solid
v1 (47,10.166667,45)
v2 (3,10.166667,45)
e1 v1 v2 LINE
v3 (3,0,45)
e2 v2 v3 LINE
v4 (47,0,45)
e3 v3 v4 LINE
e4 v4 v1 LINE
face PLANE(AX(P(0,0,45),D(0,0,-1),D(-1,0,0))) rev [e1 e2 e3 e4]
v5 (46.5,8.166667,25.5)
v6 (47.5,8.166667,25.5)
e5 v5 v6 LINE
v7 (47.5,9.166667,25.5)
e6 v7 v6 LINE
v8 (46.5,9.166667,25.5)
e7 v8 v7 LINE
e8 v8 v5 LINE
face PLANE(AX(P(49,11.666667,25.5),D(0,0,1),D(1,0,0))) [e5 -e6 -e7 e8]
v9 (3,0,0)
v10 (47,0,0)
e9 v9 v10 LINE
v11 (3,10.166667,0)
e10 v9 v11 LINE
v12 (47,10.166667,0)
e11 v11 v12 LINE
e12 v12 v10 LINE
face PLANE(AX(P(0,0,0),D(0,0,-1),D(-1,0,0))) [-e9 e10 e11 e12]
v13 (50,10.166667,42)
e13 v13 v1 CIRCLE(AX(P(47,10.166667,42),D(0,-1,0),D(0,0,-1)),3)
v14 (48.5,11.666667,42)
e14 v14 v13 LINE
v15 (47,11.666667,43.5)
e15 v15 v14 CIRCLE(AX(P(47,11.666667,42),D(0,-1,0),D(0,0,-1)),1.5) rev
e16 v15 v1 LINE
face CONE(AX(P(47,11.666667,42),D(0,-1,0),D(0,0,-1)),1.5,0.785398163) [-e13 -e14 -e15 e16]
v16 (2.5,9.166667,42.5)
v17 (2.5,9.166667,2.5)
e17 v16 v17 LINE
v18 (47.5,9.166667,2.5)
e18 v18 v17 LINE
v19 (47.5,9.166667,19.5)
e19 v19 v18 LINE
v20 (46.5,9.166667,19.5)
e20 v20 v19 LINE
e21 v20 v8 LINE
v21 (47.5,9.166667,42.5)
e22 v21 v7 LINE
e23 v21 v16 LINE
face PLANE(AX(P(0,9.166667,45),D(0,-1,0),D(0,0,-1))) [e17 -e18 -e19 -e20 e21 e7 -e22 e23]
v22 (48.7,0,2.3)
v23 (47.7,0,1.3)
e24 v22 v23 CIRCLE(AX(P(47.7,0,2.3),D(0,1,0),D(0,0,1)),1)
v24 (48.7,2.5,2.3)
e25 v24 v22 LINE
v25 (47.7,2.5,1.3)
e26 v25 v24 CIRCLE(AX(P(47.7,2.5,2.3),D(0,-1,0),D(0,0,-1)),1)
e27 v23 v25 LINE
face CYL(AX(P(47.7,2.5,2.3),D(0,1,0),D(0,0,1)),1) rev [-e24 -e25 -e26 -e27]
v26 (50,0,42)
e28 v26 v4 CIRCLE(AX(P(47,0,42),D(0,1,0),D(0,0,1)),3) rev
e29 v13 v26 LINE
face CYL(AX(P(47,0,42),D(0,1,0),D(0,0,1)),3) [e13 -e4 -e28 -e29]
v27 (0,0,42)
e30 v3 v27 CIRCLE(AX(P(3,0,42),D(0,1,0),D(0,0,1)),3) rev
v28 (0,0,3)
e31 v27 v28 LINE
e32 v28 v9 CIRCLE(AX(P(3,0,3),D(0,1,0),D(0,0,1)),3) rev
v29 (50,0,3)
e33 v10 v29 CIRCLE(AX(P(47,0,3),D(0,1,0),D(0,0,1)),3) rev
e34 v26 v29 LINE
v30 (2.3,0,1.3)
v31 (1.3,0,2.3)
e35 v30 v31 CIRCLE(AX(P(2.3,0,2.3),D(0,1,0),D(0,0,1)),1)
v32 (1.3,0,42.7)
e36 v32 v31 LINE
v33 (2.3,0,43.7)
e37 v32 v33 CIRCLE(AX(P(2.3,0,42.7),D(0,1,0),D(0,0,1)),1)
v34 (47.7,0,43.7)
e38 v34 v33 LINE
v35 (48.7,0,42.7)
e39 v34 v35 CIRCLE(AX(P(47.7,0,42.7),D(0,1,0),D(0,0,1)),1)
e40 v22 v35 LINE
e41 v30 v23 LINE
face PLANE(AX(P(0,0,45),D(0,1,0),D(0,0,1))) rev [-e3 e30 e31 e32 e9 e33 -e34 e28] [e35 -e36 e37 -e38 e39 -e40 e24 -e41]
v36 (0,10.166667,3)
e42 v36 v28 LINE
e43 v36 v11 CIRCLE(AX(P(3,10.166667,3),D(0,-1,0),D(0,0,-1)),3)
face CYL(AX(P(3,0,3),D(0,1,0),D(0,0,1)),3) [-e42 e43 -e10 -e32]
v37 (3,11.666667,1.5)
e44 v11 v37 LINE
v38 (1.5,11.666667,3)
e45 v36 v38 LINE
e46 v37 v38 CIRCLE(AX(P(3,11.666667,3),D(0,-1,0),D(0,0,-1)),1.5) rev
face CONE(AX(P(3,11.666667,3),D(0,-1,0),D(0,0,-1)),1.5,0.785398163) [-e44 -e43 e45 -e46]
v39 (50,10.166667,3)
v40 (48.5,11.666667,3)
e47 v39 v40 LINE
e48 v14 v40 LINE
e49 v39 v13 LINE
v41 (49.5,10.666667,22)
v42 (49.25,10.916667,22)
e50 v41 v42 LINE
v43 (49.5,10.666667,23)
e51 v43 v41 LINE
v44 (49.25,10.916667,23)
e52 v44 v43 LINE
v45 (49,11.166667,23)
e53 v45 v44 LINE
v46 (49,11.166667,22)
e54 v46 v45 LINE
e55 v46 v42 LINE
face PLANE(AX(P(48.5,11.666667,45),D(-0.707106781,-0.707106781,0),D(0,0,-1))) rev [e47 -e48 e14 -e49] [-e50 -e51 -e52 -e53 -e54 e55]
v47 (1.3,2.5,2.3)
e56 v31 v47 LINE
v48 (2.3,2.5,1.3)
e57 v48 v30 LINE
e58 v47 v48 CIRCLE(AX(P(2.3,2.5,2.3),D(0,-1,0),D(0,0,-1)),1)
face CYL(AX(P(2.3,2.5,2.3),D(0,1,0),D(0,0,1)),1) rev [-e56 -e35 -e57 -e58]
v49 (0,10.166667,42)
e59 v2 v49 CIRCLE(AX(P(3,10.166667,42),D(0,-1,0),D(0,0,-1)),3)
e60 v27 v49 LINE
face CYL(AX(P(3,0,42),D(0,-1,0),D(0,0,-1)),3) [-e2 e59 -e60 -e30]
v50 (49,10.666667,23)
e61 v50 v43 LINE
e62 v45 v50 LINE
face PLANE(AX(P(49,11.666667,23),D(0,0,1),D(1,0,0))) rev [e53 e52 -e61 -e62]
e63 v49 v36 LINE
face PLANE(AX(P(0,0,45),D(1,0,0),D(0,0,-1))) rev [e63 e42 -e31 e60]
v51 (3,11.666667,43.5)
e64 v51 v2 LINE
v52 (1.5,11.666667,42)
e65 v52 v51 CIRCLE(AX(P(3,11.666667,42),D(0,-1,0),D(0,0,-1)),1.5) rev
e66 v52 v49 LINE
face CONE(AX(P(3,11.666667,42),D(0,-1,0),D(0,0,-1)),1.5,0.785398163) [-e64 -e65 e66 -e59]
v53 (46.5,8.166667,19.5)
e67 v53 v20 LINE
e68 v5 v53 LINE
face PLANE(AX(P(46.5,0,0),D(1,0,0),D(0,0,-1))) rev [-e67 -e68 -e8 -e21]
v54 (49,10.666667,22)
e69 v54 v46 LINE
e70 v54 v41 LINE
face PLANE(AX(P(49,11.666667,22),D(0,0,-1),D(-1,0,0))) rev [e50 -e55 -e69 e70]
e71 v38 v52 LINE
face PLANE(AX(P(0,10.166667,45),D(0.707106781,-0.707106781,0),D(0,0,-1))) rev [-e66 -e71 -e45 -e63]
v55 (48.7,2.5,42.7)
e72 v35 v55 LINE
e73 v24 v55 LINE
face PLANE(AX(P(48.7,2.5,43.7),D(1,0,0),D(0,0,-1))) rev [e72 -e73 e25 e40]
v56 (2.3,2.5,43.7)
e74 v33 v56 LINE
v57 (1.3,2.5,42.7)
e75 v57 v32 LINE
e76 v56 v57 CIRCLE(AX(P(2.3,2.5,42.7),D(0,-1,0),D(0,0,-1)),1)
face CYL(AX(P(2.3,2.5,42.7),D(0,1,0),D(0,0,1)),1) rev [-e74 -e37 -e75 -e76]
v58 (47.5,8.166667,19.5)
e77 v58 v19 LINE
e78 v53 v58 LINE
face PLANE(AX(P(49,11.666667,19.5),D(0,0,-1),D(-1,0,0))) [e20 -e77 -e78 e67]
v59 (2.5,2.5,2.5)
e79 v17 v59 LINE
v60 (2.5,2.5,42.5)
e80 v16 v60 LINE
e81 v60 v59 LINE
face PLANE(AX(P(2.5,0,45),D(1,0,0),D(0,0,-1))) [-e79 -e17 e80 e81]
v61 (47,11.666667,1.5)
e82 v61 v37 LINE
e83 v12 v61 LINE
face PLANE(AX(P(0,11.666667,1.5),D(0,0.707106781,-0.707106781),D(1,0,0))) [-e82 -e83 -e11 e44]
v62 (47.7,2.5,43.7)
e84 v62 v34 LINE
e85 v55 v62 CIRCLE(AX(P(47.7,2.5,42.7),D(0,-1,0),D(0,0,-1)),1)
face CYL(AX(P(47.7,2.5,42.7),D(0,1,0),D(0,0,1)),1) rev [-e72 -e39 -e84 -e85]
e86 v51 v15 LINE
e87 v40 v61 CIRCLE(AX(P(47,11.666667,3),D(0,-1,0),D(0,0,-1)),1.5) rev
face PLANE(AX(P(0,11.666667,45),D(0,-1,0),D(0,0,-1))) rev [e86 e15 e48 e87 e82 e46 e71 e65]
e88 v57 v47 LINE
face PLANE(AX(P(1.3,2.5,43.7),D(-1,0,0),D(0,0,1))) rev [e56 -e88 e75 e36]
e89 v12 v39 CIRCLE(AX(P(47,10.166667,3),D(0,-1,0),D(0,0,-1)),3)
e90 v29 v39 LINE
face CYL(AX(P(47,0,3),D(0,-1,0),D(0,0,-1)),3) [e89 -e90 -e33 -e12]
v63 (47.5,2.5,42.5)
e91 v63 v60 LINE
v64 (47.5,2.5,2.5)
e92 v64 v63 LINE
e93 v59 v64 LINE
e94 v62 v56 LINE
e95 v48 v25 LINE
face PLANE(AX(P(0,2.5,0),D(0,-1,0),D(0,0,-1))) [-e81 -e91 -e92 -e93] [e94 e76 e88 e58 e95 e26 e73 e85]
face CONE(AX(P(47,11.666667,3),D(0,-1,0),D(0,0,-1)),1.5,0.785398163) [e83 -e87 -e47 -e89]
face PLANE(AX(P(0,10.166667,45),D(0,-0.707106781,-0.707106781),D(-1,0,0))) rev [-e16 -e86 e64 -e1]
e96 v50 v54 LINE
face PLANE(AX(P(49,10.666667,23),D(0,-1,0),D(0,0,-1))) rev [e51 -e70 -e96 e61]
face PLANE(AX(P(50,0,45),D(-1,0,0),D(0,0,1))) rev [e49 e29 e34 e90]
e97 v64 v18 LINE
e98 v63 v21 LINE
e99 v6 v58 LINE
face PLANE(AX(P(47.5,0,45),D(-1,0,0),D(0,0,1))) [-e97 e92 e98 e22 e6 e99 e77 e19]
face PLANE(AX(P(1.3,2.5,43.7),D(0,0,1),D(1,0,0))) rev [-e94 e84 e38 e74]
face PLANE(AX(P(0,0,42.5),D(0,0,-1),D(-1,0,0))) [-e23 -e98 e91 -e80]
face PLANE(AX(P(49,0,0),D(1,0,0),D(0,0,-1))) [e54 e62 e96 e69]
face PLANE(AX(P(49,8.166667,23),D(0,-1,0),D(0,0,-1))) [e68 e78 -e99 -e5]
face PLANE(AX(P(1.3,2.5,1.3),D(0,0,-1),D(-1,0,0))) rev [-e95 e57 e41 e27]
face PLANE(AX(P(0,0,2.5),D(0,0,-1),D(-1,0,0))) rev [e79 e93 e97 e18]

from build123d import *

# Parameters (mm, degrees)
SKETCH1_W           = 50
SKETCH1_H           = 11.666666667
BOSS_EXTRUDE1_DEPTH = 45
SKETCH2_W           = 1
SKETCH2_H           = 1
CUT_EXTRUDE1_DEPTH  = 1
SHELL1_T            = -2.5
SKETCH3_W           = 47.4
SKETCH3_H           = 42.4
SKETCH3_W_2         = 45
SKETCH3_H_2         = 40
CUT_EXTRUDE3_DEPTH  = 2.5
FILLET1_R           = 1
FILLET2_R           = 3
CHAMFER1_SIZE       = 1.5


with BuildPart() as part:
    # Sketch1 → Boss-Extrude1 (new body)
    with BuildSketch(Plane.XY):
        with Locations((25, 5.833333334)):
            Rectangle(SKETCH1_W, SKETCH1_H)
    extrude(amount=BOSS_EXTRUDE1_DEPTH)

    # Sketch2 → Cut-Extrude1 (cut)
    with BuildSketch(Plane(origin=(50, 0, 0), x_dir=(0, 0, -1), z_dir=(1, 0, 0))):
        with Locations((-22.5, 11.166666667)):
            Rectangle(SKETCH2_W, SKETCH2_H)
    extrude(amount=-CUT_EXTRUDE1_DEPTH, mode=Mode.SUBTRACT)

    # Shell1
    shell1_openings = [part.faces().sort_by_distance(p)[0] for p in [
        (25, 0, 22.5),
    ]]
    offset(amount=SHELL1_T, openings=shell1_openings, kind=Kind.INTERSECTION)

    # Sketch3 → Cut-Extrude3 (cut)
    with BuildSketch(Plane.XZ):
        with Locations((25, 22.5)):
            Rectangle(SKETCH3_W, SKETCH3_H)
        with Locations((25, 22.5)):
            Rectangle(SKETCH3_W_2, SKETCH3_H_2, mode=Mode.SUBTRACT)
    extrude(amount=-CUT_EXTRUDE3_DEPTH, mode=Mode.SUBTRACT)

    # Fillet1
    fillet1_edges = [part.edges().sort_by_distance(p)[0] for p in [
        (1.3, 1.25, 1.3),
        (1.3, 1.25, 43.7),
        (48.7, 1.25, 43.7),
        (48.7, 1.25, 1.3),
    ]]
    fillet(fillet1_edges, radius=FILLET1_R)

    # Fillet2
    fillet2_edges = [part.edges().sort_by_distance(p)[0] for p in [
        (50, 5.833333333, 45),
        (0, 5.833333333, 45),
        (50, 5.833333333, 0),
        (0, 5.833333333, 0),
    ]]
    fillet(fillet2_edges, radius=FILLET2_R)

    # Chamfer1
    # the kernel refuses this chamfer: 1.5 mm, written as the material it takes off along each edge
    with BuildSketch(Plane(origin=(50, 11.666666667, 19.142475518), x_dir=(0.027495876610586768, -0.9996219169112968, 0), z_dir=(0, 0, 1)), Plane(origin=(50, 11.666666667, 3), x_dir=(0.027495876610586768, -0.9996219169112968, 0), z_dir=(0, 0, 1))) as chamfer1_piece_1:
        Polygon((CHAMFER1_SIZE * 0.999621916911, -CHAMFER1_SIZE * 0.0274958766106), (-CHAMFER1_SIZE * 0.0274958766106, -CHAMFER1_SIZE * 0.999621916911), (0, 0), align=None)
    extrude(amount=22.857524482, mode=Mode.SUBTRACT)
    with BuildSketch(Plane(origin=(47, 11.666666667, 42), x_dir=(0, 0, 1), z_dir=(-1, 0, 0))) as chamfer1_piece_2:
        Polygon((3, -CHAMFER1_SIZE), (3 - CHAMFER1_SIZE, 0), (3, 0), align=None)
    revolve(axis=Axis((47, 11.666666667, 42), (0, 1, 0)), revolution_arc=90, mode=Mode.SUBTRACT)
    with BuildSketch(Plane(origin=(47, 11.666666667, 3), x_dir=(0, 0, -1), z_dir=(-1, 0, 0))) as chamfer1_piece_3:
        Polygon((3, CHAMFER1_SIZE), (3 - CHAMFER1_SIZE, 0), (3, 0), align=None)
    revolve(axis=Axis((47, 11.666666667, 3), (0, -1, 0)), revolution_arc=90, mode=Mode.SUBTRACT)
    with BuildSketch(Plane(origin=(47, 11.666666667, 45), x_dir=(0, -0.9996219169112965, 0.02749587661058676), z_dir=(-1, 0, 0))) as chamfer1_piece_4:
        Polygon((CHAMFER1_SIZE * 0.999621916911, -CHAMFER1_SIZE * 0.0274958766106), (-CHAMFER1_SIZE * 0.0274958766106, -CHAMFER1_SIZE * 0.999621916911), (0, 0), align=None)
    extrude(amount=44, mode=Mode.SUBTRACT)
    with BuildSketch(Plane(origin=(47, 11.666666667, 0), x_dir=(0, -0.9996219169112968, -0.02749587661058636), z_dir=(-1, 0, 0))) as chamfer1_piece_5:
        Polygon((CHAMFER1_SIZE * 0.999621916911, CHAMFER1_SIZE * 0.0274958766106), (-CHAMFER1_SIZE * 0.0274958766106, CHAMFER1_SIZE * 0.999621916911), (0, 0), align=None)
    extrude(amount=44, mode=Mode.SUBTRACT)
    with BuildSketch(Plane(origin=(3, 11.666666667, 42), x_dir=(-1, 0, 0), z_dir=(0, 0, -1))) as chamfer1_piece_6:
        Polygon((3, -CHAMFER1_SIZE), (3 - CHAMFER1_SIZE, 0), (3, 0), align=None)
    revolve(axis=Axis((3, 11.666666667, 42), (0, 1, 0)), revolution_arc=90, mode=Mode.SUBTRACT)
    with BuildSketch(Plane(origin=(3, 11.666666667, 3), x_dir=(-1, 0, 0), z_dir=(0, 0, 1))) as chamfer1_piece_7:
        Polygon((3, CHAMFER1_SIZE), (3 - CHAMFER1_SIZE, 0), (3, 0), align=None)
    revolve(axis=Axis((3, 11.666666667, 3), (0, -1, 0)), revolution_arc=90, mode=Mode.SUBTRACT)
    with BuildSketch(Plane(origin=(0, 11.666666667, 3), x_dir=(-0.02749587661058636, -0.9996219169112968, 0), z_dir=(0, 0, 1))) as chamfer1_piece_8:
        Polygon((CHAMFER1_SIZE * 0.999621916911, CHAMFER1_SIZE * 0.0274958766106), (-CHAMFER1_SIZE * 0.0274958766106, CHAMFER1_SIZE * 0.999621916911), (0, 0), align=None)
    extrude(amount=39, mode=Mode.SUBTRACT)


solid = part.part
